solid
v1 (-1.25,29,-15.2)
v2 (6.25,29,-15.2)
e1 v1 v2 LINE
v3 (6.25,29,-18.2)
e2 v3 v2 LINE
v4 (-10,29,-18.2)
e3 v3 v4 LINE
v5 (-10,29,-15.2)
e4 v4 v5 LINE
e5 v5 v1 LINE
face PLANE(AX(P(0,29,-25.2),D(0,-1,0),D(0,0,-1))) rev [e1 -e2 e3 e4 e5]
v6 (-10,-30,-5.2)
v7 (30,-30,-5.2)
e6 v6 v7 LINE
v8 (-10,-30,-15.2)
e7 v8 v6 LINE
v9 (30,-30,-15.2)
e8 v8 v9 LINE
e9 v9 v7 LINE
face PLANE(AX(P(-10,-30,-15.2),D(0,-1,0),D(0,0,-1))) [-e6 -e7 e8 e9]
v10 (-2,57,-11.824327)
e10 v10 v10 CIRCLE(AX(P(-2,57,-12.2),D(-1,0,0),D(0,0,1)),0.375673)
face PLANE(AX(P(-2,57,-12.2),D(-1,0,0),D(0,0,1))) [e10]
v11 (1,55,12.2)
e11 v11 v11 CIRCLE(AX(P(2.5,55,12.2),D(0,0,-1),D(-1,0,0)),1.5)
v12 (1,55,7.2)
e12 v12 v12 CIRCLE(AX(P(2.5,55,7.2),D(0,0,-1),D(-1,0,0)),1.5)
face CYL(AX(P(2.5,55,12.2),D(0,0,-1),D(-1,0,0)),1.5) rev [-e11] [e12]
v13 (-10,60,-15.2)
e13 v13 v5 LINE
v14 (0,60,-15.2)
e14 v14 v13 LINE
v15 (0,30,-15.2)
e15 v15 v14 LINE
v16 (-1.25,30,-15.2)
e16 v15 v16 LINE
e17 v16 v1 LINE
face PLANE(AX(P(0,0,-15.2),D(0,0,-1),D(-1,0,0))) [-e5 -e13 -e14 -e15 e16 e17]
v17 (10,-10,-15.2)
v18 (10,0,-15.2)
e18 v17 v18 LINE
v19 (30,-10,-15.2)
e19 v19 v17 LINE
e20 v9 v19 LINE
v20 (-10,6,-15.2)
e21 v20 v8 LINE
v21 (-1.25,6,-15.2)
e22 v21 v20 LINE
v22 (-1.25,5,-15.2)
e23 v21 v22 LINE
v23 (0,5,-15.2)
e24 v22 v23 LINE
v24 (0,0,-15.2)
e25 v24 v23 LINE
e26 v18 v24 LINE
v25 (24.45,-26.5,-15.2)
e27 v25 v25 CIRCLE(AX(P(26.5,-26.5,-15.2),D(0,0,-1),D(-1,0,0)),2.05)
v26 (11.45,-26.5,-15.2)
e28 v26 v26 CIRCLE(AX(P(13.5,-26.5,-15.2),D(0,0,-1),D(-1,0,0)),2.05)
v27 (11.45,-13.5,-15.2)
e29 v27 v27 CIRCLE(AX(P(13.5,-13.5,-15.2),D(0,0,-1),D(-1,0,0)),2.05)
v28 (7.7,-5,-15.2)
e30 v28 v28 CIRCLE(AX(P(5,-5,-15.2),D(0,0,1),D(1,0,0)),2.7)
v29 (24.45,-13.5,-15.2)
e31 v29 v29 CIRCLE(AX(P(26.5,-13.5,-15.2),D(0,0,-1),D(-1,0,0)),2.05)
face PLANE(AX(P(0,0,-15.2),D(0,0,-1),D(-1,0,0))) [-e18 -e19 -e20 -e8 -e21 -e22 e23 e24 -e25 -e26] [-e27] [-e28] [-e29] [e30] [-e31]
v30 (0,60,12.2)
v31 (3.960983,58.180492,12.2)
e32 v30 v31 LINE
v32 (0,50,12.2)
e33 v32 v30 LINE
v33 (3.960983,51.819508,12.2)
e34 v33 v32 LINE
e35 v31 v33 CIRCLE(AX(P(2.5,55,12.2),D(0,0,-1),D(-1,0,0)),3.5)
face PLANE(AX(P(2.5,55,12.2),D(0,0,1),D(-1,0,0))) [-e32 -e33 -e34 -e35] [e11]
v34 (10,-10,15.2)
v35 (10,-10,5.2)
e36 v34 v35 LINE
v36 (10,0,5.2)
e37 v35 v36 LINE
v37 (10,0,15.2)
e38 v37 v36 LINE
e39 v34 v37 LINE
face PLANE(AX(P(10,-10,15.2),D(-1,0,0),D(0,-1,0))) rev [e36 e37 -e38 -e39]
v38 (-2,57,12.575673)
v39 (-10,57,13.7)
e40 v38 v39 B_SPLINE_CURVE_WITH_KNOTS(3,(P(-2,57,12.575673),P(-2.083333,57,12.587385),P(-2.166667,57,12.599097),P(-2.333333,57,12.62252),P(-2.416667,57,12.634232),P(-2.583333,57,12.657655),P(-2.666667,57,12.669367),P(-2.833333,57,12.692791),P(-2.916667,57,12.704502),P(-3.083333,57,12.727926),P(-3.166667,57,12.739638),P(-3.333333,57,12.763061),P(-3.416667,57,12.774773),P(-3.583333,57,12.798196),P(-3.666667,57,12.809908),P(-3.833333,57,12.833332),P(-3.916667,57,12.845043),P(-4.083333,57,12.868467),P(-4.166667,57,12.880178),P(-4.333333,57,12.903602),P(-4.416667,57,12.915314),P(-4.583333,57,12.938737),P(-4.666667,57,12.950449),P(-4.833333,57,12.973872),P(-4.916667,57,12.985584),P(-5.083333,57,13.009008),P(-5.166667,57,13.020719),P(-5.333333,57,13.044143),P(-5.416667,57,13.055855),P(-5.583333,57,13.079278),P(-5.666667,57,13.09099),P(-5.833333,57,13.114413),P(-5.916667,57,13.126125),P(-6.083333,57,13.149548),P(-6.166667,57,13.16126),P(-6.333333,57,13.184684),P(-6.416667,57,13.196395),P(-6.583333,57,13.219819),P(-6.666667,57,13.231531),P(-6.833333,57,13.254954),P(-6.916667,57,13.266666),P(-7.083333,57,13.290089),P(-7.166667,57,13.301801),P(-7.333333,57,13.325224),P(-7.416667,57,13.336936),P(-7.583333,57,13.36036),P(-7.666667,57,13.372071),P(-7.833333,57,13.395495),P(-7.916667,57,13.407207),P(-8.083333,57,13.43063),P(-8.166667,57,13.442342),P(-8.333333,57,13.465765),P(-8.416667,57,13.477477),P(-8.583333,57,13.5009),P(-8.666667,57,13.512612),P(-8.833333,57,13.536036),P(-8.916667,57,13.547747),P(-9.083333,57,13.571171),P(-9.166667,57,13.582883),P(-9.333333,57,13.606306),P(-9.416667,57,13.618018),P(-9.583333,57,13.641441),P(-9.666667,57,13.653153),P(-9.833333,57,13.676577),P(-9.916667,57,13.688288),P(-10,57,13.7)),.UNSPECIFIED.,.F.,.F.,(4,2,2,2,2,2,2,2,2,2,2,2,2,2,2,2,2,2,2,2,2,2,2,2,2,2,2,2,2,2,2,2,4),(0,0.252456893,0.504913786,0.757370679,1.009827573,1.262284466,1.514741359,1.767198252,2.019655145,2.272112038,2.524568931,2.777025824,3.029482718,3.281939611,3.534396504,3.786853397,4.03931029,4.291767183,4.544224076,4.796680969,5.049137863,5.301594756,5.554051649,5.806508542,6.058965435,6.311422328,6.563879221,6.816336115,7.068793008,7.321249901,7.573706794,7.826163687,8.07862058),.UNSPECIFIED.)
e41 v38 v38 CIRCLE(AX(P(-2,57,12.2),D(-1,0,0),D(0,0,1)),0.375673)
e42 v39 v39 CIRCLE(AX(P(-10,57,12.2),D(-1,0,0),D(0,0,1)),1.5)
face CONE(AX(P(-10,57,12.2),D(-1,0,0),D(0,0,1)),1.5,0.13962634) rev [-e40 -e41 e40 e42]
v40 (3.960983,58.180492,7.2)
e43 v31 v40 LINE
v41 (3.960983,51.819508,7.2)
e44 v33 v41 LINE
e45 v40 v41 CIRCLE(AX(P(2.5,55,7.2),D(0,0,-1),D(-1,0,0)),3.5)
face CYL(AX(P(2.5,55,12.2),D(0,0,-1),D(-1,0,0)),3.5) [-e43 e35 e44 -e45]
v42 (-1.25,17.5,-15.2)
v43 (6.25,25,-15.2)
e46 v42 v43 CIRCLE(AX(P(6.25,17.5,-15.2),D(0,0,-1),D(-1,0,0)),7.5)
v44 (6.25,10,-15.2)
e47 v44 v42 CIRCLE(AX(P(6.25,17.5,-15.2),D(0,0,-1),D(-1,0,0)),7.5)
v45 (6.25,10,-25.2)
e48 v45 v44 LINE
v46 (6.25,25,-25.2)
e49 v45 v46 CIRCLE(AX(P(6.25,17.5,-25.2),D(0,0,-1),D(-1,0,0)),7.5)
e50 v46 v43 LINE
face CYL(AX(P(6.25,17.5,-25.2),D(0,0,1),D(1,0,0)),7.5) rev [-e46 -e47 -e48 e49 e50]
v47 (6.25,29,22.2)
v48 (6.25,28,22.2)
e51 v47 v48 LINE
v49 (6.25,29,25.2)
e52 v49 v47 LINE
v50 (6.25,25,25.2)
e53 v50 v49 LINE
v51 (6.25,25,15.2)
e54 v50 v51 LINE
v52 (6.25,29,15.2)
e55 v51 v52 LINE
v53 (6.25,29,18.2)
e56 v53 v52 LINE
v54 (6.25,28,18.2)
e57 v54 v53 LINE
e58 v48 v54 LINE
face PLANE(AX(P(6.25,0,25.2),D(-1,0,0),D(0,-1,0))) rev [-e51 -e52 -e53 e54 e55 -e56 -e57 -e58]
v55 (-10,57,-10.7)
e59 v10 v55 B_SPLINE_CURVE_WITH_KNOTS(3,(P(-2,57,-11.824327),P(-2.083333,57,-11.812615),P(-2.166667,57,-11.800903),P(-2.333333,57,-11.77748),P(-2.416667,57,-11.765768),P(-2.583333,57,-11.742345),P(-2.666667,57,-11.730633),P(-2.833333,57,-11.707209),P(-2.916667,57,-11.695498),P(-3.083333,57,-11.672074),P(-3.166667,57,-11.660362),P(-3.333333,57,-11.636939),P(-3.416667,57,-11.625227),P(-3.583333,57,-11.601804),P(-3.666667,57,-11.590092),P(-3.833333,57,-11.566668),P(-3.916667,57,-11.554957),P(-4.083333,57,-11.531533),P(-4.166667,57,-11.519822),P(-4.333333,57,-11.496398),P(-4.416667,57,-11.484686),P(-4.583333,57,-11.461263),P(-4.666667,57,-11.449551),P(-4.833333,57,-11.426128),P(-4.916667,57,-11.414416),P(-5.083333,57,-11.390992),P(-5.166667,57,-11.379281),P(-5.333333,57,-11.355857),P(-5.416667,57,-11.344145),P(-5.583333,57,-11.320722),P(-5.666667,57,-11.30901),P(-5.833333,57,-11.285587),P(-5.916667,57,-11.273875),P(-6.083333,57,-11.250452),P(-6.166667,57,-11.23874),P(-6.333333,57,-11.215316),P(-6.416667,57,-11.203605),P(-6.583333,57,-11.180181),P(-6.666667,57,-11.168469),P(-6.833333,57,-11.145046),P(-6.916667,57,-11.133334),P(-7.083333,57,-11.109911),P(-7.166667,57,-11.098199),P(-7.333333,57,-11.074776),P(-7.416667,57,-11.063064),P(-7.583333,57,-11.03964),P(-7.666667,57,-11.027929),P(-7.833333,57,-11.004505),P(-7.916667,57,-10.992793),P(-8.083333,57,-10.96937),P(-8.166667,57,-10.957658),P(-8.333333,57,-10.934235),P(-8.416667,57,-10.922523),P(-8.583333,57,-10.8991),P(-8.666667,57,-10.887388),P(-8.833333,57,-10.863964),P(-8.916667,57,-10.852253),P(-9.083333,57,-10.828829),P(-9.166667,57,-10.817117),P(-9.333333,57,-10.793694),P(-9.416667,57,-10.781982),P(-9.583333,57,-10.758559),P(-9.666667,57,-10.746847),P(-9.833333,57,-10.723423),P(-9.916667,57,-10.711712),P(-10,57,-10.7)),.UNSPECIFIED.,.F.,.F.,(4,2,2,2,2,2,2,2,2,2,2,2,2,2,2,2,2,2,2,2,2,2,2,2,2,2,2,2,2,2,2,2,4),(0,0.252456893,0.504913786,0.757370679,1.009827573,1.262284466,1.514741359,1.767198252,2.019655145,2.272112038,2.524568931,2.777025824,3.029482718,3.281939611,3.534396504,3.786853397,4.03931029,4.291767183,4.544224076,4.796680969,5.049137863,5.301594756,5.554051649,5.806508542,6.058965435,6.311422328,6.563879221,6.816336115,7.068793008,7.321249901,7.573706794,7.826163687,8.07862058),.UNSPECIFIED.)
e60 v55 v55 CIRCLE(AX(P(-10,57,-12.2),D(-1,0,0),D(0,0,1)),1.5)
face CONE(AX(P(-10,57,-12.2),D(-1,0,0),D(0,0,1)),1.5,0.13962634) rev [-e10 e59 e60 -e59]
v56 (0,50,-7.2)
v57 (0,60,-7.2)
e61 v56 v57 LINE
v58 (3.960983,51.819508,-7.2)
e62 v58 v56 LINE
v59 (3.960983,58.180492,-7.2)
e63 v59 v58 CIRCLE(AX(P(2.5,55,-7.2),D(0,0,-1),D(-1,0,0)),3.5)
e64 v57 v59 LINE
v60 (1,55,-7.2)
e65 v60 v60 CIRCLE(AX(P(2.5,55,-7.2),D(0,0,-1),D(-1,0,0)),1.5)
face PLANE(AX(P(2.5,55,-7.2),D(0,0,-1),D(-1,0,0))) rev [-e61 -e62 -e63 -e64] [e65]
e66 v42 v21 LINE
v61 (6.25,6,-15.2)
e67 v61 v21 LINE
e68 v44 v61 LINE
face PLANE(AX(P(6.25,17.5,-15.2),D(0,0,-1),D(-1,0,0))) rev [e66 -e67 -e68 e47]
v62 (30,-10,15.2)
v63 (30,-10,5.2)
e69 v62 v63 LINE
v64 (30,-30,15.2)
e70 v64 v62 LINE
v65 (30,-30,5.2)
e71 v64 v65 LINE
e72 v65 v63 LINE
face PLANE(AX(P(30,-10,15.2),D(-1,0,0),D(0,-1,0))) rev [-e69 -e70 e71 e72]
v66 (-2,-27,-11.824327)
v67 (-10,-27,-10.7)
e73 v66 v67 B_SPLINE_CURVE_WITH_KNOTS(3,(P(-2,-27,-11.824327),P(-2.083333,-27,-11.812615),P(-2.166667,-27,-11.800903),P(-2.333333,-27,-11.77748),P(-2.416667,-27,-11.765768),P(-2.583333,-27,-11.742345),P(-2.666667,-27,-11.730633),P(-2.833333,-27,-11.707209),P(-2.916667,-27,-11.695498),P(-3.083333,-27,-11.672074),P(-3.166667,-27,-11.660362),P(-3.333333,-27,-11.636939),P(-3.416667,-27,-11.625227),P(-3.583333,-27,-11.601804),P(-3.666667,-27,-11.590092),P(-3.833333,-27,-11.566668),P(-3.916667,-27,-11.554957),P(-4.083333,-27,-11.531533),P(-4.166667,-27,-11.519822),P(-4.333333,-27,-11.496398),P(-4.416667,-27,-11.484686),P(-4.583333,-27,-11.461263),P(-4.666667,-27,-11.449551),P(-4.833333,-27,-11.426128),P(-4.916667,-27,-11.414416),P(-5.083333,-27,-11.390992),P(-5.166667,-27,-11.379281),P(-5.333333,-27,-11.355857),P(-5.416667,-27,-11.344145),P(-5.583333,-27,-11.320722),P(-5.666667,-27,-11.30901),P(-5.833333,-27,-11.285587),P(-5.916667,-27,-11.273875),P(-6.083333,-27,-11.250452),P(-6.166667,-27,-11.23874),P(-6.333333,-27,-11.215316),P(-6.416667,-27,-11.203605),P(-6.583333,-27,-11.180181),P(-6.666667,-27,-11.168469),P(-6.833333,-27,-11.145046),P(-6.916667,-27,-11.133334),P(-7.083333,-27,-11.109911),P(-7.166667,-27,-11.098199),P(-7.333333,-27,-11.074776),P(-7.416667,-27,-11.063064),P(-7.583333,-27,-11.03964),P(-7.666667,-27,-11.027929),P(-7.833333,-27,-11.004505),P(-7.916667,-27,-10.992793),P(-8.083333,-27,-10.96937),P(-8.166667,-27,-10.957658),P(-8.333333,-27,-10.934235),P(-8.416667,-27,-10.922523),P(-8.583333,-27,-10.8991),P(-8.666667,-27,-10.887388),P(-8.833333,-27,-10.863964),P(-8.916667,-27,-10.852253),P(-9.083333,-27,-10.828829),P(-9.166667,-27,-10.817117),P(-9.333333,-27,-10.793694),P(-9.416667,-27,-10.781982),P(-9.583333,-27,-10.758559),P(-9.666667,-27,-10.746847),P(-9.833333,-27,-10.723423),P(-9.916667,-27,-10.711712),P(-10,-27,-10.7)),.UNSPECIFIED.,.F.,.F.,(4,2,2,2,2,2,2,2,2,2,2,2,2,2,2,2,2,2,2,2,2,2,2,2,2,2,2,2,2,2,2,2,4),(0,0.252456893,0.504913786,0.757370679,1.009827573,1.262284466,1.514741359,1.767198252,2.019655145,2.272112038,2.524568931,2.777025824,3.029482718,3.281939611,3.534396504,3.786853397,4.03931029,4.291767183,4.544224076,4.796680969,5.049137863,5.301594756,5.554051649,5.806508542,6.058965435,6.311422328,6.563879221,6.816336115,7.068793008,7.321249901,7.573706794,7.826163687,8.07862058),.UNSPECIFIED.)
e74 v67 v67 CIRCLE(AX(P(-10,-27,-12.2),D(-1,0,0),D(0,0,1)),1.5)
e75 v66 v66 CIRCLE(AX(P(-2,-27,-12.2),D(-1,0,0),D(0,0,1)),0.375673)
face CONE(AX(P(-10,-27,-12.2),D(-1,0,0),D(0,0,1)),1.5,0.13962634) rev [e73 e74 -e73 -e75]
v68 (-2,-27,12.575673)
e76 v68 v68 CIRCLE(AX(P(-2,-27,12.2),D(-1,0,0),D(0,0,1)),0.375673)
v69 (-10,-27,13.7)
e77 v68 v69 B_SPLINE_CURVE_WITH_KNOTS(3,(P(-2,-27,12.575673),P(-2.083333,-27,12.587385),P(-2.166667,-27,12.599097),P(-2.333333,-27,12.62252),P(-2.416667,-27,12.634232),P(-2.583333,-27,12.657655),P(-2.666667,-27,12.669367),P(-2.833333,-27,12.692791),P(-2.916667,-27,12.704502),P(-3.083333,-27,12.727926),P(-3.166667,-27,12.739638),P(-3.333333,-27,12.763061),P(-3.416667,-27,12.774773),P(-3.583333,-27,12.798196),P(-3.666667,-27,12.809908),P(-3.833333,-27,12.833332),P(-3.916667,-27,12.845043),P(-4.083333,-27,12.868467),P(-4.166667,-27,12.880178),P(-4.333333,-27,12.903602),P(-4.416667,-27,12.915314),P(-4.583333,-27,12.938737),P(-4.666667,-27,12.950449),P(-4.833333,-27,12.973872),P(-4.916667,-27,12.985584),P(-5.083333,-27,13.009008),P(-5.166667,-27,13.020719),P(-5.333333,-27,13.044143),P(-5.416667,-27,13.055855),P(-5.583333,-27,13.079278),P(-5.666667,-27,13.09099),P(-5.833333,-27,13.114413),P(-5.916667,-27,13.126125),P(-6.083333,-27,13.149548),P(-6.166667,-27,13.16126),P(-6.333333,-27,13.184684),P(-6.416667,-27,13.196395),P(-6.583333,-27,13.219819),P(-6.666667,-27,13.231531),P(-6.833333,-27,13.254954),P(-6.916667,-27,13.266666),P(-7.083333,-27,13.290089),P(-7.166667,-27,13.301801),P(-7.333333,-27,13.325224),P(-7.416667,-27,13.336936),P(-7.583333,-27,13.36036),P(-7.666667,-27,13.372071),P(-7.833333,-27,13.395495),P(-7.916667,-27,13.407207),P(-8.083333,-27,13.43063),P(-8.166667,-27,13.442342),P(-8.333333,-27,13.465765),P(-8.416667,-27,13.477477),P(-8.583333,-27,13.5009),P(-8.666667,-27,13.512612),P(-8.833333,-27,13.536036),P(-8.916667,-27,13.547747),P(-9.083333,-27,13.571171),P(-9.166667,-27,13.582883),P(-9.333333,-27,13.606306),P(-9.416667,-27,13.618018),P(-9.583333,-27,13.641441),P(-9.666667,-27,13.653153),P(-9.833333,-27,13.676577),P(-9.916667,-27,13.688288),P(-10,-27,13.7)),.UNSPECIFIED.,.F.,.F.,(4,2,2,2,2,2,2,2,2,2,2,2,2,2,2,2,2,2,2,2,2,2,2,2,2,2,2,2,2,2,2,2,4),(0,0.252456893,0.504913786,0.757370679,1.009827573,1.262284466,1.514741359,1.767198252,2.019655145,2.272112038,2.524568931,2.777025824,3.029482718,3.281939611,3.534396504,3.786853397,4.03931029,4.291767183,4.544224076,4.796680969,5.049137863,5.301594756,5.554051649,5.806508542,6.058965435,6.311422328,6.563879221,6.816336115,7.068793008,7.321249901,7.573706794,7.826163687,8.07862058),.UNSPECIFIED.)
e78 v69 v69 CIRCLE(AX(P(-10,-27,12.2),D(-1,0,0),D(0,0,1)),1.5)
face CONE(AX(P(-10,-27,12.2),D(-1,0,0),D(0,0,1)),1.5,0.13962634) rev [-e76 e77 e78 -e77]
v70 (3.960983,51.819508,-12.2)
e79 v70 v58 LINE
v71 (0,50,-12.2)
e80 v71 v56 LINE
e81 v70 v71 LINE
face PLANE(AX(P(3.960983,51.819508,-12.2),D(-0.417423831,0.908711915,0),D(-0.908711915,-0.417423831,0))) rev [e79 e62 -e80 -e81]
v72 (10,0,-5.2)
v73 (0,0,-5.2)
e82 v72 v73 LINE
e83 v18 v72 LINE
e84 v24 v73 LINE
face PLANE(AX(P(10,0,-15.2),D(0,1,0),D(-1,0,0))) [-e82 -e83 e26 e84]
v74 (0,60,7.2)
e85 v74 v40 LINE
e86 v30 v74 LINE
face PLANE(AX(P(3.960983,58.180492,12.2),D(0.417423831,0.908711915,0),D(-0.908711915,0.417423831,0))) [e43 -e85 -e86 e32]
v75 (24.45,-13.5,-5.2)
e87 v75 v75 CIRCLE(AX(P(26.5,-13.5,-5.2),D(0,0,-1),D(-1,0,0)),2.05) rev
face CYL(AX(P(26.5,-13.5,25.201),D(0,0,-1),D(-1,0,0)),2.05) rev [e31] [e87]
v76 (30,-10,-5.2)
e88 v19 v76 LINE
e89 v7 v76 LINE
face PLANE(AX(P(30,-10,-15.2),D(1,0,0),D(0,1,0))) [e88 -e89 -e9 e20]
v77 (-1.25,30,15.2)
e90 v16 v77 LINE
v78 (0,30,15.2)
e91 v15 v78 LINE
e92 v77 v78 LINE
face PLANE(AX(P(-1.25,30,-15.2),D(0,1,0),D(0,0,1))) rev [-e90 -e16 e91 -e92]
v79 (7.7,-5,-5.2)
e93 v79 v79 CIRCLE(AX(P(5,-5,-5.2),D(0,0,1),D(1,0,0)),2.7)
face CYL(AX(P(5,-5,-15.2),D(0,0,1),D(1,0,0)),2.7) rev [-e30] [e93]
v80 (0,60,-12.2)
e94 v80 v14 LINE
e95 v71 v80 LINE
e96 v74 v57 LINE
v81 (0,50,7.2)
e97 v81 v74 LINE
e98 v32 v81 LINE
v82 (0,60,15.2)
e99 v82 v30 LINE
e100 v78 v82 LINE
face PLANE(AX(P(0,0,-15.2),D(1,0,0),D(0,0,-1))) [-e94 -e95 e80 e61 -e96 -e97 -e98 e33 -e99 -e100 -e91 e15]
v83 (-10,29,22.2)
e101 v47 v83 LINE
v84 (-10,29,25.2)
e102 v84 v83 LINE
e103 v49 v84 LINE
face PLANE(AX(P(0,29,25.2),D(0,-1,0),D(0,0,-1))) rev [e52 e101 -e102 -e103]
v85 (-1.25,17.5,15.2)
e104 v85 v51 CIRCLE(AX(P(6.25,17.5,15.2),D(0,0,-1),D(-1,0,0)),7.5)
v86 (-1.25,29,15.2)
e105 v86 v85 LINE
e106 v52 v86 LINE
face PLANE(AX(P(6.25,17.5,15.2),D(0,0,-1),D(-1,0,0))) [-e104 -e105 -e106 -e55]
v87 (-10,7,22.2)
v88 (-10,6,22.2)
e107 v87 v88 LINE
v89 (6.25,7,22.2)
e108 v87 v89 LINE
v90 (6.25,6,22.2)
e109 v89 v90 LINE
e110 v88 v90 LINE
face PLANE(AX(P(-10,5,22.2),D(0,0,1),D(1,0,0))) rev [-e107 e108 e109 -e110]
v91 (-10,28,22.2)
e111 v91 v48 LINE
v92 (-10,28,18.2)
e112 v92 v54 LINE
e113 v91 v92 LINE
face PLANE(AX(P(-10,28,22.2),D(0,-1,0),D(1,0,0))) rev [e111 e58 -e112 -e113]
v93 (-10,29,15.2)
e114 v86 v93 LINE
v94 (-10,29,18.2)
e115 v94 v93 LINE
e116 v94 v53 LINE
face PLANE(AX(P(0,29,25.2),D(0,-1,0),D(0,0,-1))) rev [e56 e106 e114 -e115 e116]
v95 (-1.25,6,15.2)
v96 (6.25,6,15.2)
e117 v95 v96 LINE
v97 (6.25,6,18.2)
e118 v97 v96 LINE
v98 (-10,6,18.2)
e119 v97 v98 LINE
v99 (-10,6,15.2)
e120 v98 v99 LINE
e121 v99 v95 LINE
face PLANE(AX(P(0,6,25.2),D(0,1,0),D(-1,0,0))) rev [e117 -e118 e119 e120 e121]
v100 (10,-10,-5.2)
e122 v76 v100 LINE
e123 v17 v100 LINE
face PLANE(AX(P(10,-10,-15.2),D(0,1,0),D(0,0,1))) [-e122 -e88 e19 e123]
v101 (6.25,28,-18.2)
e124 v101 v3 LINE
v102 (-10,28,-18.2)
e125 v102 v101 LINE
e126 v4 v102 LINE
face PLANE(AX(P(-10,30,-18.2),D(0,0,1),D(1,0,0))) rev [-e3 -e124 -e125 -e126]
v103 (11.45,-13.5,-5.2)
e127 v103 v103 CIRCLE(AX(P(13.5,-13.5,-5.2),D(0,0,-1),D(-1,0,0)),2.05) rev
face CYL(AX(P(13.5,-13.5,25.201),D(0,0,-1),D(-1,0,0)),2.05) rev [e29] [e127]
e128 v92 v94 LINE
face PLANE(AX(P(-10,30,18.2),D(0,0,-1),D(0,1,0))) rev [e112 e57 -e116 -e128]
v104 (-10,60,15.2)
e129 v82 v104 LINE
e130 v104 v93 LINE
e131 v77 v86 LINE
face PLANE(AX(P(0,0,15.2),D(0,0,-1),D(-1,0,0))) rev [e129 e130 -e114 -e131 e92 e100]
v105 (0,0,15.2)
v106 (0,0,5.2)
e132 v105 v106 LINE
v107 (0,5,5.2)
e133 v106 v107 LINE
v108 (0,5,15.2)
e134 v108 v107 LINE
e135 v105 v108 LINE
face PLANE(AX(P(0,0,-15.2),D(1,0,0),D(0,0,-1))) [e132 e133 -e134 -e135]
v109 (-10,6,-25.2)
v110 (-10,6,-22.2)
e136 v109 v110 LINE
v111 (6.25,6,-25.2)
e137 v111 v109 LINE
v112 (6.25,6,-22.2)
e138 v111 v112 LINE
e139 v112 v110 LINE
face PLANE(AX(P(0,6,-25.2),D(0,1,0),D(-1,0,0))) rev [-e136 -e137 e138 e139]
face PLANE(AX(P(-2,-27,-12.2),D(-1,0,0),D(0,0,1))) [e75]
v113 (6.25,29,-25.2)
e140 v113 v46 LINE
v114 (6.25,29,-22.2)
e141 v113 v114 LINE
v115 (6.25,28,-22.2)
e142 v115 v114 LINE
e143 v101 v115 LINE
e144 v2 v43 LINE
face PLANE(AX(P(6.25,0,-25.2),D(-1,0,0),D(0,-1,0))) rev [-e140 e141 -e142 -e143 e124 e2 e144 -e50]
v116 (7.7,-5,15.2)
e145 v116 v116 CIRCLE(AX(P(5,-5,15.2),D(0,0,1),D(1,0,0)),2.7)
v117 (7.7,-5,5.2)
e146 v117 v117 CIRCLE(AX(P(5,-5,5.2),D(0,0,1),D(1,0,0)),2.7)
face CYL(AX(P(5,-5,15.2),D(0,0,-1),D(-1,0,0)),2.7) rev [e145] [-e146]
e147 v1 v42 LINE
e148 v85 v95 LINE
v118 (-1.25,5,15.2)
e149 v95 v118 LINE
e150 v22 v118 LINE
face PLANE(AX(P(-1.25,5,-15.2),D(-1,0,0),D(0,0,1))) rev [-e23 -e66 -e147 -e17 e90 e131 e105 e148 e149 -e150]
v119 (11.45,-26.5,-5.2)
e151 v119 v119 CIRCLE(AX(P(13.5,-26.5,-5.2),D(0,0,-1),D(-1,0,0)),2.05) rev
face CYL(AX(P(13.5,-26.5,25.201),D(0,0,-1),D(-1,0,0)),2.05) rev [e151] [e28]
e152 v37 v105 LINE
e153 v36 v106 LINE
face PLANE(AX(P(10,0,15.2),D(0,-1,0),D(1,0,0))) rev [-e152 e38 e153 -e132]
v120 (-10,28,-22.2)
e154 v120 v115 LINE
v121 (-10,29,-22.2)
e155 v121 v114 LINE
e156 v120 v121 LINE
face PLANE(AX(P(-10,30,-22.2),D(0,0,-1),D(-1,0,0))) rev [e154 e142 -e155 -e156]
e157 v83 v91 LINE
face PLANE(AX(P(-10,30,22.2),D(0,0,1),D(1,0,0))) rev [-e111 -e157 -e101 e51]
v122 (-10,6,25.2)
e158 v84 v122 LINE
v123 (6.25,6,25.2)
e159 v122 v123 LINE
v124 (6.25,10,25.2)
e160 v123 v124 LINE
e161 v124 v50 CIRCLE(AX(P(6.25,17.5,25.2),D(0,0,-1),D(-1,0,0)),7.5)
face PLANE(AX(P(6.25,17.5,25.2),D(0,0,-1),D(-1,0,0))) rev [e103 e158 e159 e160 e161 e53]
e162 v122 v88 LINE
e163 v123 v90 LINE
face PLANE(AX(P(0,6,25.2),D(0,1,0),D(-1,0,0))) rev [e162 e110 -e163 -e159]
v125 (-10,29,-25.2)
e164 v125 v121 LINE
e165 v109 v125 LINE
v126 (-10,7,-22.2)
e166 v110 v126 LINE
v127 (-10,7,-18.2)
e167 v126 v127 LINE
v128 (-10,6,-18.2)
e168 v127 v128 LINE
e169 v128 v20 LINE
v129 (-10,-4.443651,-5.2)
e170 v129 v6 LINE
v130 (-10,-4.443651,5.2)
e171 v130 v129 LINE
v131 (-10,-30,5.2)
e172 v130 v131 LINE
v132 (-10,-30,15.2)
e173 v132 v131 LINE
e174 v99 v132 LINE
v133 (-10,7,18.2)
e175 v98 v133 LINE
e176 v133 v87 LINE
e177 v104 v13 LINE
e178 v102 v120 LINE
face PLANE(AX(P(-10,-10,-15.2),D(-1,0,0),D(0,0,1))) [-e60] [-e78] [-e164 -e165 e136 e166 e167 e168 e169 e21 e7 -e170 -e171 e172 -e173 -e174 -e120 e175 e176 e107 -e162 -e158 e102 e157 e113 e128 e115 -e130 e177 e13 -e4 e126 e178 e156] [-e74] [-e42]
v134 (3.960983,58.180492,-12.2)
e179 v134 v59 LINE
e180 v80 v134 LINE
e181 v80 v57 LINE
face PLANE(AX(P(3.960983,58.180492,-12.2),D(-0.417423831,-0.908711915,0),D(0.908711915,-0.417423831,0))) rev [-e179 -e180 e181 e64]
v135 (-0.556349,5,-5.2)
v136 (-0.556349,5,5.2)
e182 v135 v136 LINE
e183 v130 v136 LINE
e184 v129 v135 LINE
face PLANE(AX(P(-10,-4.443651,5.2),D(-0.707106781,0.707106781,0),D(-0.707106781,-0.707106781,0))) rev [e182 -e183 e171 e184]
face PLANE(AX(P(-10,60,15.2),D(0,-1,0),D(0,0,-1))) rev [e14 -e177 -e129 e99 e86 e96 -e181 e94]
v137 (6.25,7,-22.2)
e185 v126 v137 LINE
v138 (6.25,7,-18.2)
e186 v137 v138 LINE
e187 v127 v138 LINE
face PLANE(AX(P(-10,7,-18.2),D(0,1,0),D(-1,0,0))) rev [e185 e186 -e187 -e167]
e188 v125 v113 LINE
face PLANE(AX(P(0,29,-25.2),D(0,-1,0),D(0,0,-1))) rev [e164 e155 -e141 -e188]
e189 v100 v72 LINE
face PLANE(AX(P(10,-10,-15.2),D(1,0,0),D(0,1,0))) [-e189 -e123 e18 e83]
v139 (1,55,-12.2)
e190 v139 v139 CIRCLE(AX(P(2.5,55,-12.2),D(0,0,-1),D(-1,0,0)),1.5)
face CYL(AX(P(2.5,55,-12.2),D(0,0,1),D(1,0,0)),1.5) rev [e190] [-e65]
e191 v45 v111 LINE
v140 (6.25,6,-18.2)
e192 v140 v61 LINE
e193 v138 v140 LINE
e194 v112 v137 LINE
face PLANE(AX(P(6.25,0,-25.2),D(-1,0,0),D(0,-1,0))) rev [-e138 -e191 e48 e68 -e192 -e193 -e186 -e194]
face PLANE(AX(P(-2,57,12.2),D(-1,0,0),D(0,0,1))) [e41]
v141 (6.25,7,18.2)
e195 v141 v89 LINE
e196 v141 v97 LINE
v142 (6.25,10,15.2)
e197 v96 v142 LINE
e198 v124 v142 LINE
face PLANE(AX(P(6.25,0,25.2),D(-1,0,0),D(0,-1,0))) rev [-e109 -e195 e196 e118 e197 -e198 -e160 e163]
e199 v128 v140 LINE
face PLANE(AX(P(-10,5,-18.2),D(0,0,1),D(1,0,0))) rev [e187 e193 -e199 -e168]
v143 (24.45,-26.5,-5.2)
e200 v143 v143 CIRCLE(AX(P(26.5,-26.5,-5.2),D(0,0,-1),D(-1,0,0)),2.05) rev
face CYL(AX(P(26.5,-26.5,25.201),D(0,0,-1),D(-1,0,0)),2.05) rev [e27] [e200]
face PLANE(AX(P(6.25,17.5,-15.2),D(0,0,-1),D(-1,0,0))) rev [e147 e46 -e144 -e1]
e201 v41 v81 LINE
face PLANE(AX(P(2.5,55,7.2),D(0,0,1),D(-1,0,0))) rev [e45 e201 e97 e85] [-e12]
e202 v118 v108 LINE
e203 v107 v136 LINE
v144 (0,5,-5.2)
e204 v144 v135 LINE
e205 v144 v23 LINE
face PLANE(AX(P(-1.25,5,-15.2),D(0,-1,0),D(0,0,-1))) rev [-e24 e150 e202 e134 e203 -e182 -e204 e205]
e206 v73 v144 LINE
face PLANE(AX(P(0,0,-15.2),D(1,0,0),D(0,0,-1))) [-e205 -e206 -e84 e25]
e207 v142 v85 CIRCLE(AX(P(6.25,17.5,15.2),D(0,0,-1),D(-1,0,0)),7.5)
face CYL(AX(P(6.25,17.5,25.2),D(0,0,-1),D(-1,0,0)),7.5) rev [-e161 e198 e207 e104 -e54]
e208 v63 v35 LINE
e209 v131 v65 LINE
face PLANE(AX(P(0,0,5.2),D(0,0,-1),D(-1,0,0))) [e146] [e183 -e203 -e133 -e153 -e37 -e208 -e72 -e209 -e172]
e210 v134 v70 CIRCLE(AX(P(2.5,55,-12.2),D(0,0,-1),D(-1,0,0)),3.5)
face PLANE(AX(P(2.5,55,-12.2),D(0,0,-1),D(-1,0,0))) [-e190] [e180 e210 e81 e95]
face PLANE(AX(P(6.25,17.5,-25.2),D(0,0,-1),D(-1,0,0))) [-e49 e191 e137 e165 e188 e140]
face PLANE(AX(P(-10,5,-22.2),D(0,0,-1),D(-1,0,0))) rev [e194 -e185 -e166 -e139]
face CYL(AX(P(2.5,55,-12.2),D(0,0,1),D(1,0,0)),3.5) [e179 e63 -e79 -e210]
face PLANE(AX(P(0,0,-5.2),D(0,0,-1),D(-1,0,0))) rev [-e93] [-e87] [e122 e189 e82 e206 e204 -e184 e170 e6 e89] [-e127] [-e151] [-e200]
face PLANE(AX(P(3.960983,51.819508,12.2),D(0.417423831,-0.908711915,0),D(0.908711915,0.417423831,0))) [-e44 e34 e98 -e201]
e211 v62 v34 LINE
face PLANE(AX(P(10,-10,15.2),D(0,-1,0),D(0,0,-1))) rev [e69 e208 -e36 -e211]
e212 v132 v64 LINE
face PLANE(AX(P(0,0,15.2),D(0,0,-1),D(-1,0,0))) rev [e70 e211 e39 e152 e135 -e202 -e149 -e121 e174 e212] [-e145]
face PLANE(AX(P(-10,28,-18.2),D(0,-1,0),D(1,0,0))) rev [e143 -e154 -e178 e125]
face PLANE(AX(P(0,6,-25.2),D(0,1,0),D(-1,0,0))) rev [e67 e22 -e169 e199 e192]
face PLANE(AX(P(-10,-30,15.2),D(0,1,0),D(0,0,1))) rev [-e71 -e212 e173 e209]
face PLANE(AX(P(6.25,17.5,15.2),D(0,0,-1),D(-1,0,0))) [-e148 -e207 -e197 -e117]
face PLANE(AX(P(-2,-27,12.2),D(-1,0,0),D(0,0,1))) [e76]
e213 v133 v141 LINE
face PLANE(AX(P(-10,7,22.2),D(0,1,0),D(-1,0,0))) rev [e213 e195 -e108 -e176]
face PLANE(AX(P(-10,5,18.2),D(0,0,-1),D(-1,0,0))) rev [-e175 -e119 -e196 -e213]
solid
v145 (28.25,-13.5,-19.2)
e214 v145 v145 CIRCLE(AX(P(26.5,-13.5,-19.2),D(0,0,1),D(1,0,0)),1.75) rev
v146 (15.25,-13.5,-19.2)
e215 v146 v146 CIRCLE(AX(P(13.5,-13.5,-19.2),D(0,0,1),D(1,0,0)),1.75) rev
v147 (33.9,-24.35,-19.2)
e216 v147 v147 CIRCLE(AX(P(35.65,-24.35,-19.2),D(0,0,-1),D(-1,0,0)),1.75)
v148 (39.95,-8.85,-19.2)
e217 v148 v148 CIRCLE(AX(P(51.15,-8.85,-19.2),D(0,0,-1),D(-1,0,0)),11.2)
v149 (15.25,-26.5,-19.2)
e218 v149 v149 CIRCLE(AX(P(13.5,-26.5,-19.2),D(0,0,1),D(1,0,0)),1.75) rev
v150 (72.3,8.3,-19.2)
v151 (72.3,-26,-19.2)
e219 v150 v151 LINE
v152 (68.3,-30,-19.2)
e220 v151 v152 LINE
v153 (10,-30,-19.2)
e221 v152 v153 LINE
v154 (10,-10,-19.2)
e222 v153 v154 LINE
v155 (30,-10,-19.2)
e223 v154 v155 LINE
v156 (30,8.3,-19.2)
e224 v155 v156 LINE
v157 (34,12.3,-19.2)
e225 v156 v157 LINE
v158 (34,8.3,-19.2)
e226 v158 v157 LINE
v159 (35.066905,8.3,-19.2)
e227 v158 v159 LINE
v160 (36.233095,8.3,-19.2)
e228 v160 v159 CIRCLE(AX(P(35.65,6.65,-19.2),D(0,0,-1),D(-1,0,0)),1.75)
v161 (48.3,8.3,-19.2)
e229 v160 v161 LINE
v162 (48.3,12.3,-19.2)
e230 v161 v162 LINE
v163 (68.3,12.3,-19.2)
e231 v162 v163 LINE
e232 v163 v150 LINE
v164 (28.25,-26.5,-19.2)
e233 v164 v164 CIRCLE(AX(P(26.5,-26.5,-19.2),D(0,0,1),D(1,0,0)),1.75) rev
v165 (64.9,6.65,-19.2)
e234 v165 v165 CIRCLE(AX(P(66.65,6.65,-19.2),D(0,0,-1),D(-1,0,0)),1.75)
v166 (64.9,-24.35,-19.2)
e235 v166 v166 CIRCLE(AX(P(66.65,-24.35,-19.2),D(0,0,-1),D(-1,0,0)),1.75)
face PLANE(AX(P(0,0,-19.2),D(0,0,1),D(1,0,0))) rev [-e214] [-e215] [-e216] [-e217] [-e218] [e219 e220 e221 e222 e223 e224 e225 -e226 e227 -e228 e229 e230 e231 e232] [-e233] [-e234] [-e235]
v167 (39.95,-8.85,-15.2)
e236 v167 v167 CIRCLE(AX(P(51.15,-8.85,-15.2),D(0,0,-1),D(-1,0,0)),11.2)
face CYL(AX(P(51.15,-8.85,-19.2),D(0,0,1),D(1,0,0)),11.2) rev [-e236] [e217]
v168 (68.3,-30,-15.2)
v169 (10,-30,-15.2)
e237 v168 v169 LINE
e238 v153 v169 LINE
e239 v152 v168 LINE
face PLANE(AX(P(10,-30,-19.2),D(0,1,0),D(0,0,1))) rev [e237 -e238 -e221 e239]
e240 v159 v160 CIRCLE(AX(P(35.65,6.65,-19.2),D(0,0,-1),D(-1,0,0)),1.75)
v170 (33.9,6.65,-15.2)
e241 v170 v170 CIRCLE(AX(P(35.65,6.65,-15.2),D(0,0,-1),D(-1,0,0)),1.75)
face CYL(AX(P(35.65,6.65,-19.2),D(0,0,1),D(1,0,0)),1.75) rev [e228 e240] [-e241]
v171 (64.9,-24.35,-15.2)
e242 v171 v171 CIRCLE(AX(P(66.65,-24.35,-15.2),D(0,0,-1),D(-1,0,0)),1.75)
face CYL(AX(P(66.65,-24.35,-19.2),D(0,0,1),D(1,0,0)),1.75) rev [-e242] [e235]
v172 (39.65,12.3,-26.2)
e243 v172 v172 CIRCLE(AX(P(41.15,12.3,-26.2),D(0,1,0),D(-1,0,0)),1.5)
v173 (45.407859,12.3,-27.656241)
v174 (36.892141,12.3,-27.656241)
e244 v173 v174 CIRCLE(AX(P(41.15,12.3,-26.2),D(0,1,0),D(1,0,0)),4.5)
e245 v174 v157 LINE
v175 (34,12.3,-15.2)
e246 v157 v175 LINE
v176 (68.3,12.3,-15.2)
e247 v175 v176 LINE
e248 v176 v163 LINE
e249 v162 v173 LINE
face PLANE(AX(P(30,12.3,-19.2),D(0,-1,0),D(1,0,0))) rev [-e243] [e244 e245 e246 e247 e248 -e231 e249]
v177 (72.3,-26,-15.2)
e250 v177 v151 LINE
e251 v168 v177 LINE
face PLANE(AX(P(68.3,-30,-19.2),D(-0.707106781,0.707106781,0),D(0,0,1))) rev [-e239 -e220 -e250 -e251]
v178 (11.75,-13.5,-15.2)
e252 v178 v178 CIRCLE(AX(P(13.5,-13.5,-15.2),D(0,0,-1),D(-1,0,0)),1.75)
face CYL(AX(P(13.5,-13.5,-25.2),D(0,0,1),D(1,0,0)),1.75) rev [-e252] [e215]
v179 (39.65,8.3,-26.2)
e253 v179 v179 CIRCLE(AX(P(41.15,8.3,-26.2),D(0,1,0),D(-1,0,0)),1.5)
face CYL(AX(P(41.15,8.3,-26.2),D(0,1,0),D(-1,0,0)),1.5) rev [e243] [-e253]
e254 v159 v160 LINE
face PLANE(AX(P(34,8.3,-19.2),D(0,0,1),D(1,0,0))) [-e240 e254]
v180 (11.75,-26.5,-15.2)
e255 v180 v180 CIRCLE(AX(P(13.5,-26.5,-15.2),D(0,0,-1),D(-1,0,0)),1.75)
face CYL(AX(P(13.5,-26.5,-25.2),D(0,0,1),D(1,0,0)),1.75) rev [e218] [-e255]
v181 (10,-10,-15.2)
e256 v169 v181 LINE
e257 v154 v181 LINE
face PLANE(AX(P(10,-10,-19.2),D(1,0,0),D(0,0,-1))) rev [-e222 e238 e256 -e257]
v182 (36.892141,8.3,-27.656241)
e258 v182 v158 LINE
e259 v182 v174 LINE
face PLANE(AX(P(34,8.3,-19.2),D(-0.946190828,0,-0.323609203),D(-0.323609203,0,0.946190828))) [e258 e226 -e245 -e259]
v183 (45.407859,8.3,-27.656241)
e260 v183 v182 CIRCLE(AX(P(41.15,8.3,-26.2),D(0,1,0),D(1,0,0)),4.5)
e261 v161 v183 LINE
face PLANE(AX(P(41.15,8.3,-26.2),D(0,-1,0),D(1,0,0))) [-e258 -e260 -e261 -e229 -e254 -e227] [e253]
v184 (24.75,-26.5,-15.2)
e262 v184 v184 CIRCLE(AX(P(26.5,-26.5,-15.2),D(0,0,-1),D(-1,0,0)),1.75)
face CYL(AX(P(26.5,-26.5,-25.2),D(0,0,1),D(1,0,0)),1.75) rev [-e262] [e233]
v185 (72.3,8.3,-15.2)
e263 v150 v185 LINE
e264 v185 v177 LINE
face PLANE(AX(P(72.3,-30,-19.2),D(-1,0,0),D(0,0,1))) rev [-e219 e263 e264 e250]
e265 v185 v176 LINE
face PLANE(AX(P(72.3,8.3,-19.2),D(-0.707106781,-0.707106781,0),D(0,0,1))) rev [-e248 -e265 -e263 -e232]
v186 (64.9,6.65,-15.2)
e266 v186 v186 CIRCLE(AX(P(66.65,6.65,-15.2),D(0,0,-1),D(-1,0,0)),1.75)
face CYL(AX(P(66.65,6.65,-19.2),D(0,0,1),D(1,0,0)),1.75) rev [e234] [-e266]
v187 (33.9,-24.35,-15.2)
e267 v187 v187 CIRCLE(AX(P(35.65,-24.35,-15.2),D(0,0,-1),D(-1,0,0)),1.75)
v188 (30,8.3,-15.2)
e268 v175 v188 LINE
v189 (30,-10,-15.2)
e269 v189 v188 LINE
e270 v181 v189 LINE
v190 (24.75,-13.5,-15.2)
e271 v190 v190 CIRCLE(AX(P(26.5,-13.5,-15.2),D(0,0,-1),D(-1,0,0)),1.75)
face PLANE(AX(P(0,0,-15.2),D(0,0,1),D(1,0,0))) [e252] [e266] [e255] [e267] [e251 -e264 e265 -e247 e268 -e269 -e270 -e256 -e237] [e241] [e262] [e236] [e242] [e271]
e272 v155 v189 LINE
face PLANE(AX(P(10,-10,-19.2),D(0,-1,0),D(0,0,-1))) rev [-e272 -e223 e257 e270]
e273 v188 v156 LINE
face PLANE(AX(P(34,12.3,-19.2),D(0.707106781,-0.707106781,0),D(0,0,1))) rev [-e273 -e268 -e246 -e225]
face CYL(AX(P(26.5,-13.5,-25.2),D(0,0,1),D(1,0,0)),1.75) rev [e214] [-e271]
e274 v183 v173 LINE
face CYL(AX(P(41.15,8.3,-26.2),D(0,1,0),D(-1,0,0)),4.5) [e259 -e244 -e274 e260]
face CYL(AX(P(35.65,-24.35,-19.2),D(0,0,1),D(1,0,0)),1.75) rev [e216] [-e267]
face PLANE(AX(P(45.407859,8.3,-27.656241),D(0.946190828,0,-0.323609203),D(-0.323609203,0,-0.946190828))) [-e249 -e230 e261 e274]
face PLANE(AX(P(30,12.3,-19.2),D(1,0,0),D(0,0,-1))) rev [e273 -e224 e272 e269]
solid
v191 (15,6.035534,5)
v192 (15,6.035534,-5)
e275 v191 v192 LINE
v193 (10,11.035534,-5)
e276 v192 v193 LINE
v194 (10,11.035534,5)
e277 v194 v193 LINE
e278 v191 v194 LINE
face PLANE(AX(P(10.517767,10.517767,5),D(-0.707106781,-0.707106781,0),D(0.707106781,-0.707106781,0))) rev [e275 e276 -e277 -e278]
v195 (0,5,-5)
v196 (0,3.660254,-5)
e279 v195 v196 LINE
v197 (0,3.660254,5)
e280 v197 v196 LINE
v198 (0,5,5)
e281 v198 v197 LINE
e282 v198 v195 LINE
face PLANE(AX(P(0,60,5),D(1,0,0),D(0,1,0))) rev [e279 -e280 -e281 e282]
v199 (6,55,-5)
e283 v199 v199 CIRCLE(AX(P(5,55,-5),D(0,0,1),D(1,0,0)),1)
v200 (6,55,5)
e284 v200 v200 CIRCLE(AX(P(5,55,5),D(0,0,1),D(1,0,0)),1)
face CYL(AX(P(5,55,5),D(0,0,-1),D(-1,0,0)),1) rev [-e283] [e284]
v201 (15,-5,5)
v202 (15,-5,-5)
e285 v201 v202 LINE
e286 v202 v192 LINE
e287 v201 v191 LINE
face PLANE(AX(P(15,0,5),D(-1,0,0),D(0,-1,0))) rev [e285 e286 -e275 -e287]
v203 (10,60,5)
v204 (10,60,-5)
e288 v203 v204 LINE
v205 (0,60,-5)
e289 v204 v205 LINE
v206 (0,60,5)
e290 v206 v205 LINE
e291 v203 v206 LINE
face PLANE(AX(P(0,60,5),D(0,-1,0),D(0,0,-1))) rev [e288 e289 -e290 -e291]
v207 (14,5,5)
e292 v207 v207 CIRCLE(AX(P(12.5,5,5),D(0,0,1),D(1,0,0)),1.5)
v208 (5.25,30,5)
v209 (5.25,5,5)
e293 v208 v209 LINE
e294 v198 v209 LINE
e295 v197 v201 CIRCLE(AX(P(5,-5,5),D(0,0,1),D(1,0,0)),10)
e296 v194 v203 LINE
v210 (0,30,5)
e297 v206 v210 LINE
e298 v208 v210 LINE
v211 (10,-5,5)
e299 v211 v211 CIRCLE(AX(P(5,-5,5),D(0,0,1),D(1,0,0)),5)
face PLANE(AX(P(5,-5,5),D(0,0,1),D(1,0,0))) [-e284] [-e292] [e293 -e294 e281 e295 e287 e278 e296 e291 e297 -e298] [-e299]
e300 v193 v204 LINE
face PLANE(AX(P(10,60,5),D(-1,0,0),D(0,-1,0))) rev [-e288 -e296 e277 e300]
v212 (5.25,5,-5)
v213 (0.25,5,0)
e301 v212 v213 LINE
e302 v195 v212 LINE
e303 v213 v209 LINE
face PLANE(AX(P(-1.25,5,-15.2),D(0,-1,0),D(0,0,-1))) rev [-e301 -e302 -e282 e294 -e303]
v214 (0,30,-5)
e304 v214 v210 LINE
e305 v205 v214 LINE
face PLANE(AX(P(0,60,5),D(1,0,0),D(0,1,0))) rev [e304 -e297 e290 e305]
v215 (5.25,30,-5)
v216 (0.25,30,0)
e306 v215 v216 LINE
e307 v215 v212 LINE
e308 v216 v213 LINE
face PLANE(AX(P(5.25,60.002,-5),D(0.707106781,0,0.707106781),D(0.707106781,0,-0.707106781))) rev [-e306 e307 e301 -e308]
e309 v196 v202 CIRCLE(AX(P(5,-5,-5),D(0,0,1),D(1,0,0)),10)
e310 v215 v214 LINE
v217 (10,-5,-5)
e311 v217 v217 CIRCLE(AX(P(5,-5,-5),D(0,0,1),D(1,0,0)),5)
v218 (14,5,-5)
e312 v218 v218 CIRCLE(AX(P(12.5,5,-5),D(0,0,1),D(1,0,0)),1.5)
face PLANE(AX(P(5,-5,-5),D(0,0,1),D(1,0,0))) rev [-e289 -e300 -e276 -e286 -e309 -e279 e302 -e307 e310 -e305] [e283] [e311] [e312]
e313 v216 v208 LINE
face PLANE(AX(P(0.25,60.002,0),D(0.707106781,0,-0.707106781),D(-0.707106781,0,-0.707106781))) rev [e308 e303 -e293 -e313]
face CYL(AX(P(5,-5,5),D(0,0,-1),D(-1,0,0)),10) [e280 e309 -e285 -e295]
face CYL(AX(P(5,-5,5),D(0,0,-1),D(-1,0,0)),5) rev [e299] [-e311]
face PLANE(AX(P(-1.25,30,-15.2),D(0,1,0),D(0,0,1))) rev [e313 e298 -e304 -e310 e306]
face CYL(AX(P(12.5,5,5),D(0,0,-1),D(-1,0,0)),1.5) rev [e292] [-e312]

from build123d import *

# Parameters (mm, degrees)
BOSS_EXTRUDE1_START          = -5.2
SKETCH1_R                    = 2.7
BOSS_EXTRUDE1_DEPTH          = 10
BOSS_EXTRUDE3_START          = 5.2
SKETCH1_2_R                  = 2.7
BOSS_EXTRUDE3_DEPTH          = 10
SKETCH2_R                    = 5
SKETCH2_R_2                  = 1
BOSS_EXTRUDE2_DEPTH          = 5
BOSS_EXTRUDE4_DEPTH          = 5.2
CUT_EXTRUDE1_DEPTH           = 69.782555928
CUT_EXTRUDE1_DEPTH_BACK      = 69.782555928
SKETCH4_W                    = 2.5
SKETCH4_H                    = 25
BOSS_EXTRUDE5_START          = 15.2
BOSS_EXTRUDE5_DEPTH          = 10
BOSS_EXTRUDE6_START          = -25.2
BOSS_EXTRUDE6_DEPTH          = 10
CHAMFER1_SIZE                = 5
SKETCH6_R                    = 1.5
BOSS_EXTRUDE7_DEPTH          = 5
SKETCH7_W                    = 10
SKETCH7_H                    = 20
BOSS_EXTRUDE8_DEPTH          = 15.2
BOSS_EXTRUDE9_START          = -8
SKETCH8_R                    = 1.5
BOSS_EXTRUDE9_DEPTH          = 5
SKETCH9_W                    = 4
SKETCH9_H                    = 2
CUT_EXTRUDE2_DEPTH           = 70.275554852
SKETCH10_R                   = 1.5
CUT_EXTRUDE3_DEPTH           = 8
CUT_EXTRUDE3_DRAFT           = -8
CUT_EXTRUDE3_PROFILE_2_DEPTH = 8
CUT_EXTRUDE3_PROFILE_2_DRAFT = -8
CUT_EXTRUDE3_PROFILE_3_DEPTH = 8
CUT_EXTRUDE3_PROFILE_3_DRAFT = -8
CUT_EXTRUDE3_PROFILE_4_DEPTH = 8
CUT_EXTRUDE3_PROFILE_4_DRAFT = -8
SKETCH11_R                   = 2.05
SKETCH11_R_2                 = 1.75
CUT_EXTRUDE4_DEPTH           = 10
SKETCH12_R                   = 1.75
SKETCH12_R_2                 = 11.2
BOSS_EXTRUDE10_DEPTH         = 4
CHAMFER2_SIZE                = 4
SKETCH11_3_R                 = 1.75
CUT_EXTRUDE5_DEPTH           = 103.271452517
SKETCH14_R                   = 1.5
BOSS_EXTRUDE11_DEPTH         = 4
BOSS_EXTRUDE12_REACH         = 97.889


with BuildPart() as part:
    # Sketch1 → Boss-Extrude1 (new body)
    with BuildSketch(Plane.XY.offset(BOSS_EXTRUDE1_START)):
        Polygon((-10, 0), (-10, -10), (-10, -30), (30, -30), (30, -10), (10, -10), (10, 0), (0, 0), (0, 40), (-10, 40), align=None)
        with Locations((5, -5)):
            Circle(SKETCH1_R, mode=Mode.SUBTRACT)
    extrude(amount=-BOSS_EXTRUDE1_DEPTH)



with BuildPart() as body_2:
    # Sketch1<2> → Boss-Extrude3 (new body)
    with BuildSketch(Plane.XY.offset(BOSS_EXTRUDE3_START)):
        Polygon((-10, 0), (-10, -10), (-10, -30), (30, -30), (30, -10), (10, -10), (10, 0), (0, 0), (0, 40), (-10, 40), align=None)
        with Locations((5, -5)):
            Circle(SKETCH1_2_R, mode=Mode.SUBTRACT)
    extrude(amount=BOSS_EXTRUDE3_DEPTH)


with BuildPart() as body_3:
    # Sketch2 → Boss-Extrude2 (new, symmetric)
    with BuildSketch(Plane.XY):
        with BuildLine():
            Line((0, 60), (10, 60))
            Line((10, 60), (10, 3.660254038))
            ThreePointArc((10, 3.660254038), (5, -15), (0, 3.660254038))
            Line((0, 3.660254038), (0, 60))
        make_face()
        with Locations((5, -5)):
            Circle(SKETCH2_R, mode=Mode.SUBTRACT)
        with Locations((5, 55)):
            Circle(SKETCH2_R_2, mode=Mode.SUBTRACT)
    extrude(amount=BOSS_EXTRUDE2_DEPTH, both=True)


with BuildPart() as part_1:
    add(part.part)

    add(body_2.part)  # Boss-Extrude4 merges body 2
    # Sketch3 → Boss-Extrude4 (add, symmetric)
    with BuildSketch(Plane.XY):
        Polygon((-10, 40), (0, 40), (0, 5.556349186), (-10, -4.443650814), align=None)
    extrude(amount=BOSS_EXTRUDE4_DEPTH, both=True)


with BuildPart() as cut_extrude1_tool:
    # Sketch4 → Cut-Extrude1 (new, two sides: drawn at the far end of the back side and taken through both)
    with BuildSketch(Plane.XY.offset(-CUT_EXTRUDE1_DEPTH_BACK)):
        with Locations((0, 17.5)):
            Rectangle(SKETCH4_W, SKETCH4_H)
    extrude(amount=CUT_EXTRUDE1_DEPTH + CUT_EXTRUDE1_DEPTH_BACK)


with BuildPart() as part_2:
    add(part_1.part)

    # Cut-Extrude1: cut by cut_extrude1_tool
    add(cut_extrude1_tool.part, mode=Mode.SUBTRACT)

    # Sketch5 → Boss-Extrude5 (add)
    with BuildSketch(Plane.XY.offset(BOSS_EXTRUDE5_START)):
        with BuildLine():
            Line((6.25, 29), (-10, 29))
            Line((-10, 29), (-10, 6))
            Line((-10, 6), (6.25, 6))
            Line((6.25, 6), (6.25, 10))
            ThreePointArc((6.25, 10), (-1.25, 17.5), (6.25, 25))
            Line((6.25, 25), (6.25, 29))
        make_face()
    extrude(amount=BOSS_EXTRUDE5_DEPTH)

    # Sketch5<2> → Boss-Extrude6 (add)
    with BuildSketch(Plane.XY.offset(BOSS_EXTRUDE6_START)):
        with BuildLine():
            Line((6.25, 29), (-10, 29))
            Line((-10, 29), (-10, 6))
            Line((-10, 6), (6.25, 6))
            Line((6.25, 6), (6.25, 10))
            ThreePointArc((6.25, 10), (-1.25, 17.5), (6.25, 25))
            Line((6.25, 25), (6.25, 29))
        make_face()
    extrude(amount=BOSS_EXTRUDE6_DEPTH)

    # Sketch7 → Boss-Extrude8 (add, symmetric)
    with BuildSketch(Plane.XY):
        with Locations((-5, 50)):
            Rectangle(SKETCH7_W, SKETCH7_H)
    extrude(amount=BOSS_EXTRUDE8_DEPTH, both=True)

    # Sketch8 → Boss-Extrude9 (add)
    with BuildSketch(Plane(origin=(0, 0, -15.2), x_dir=(-1, 0, 0), z_dir=(0, 0, -1)).offset(BOSS_EXTRUDE9_START)):
        with BuildLine():
            Line((-3.960983408, 51.819508296), (0, 50))
            Line((0, 50), (0, 60))
            Line((0, 60), (-3.960983408, 58.180491704))
            ThreePointArc((-3.960983408, 58.180491704), (-6, 55), (-3.960983408, 51.819508296))
        make_face()
        with Locations((-2.5, 55)):
            Circle(SKETCH8_R, mode=Mode.SUBTRACT)
    boss_extrude9 = extrude(amount=BOSS_EXTRUDE9_DEPTH)

    # Mirror1: Boss-Extrude9 across plane
    add(boss_extrude9.mirror(Plane.XY))

    # Sketch9 → Cut-Extrude2 (cut, through all)
    with BuildSketch(Plane(origin=(6.25, 0, 0), x_dir=(0, 0, -1), z_dir=(1, 0, 0))):
        with Locations((20.2, 29)):
            Rectangle(SKETCH9_W, SKETCH9_H)
        with Locations((20.2, 6)):
            Rectangle(SKETCH9_W, SKETCH9_H)
        with Locations((-20.2, 6)):
            Rectangle(SKETCH9_W, SKETCH9_H)
        with Locations((-20.2, 29)):
            Rectangle(SKETCH9_W, SKETCH9_H)
    extrude(amount=-CUT_EXTRUDE2_DEPTH, mode=Mode.SUBTRACT)


with BuildPart() as body_3_1:
    add(body_3.part)

    # Cut-Extrude1: cut by cut_extrude1_tool
    add(cut_extrude1_tool.part, mode=Mode.SUBTRACT)

    # Chamfer1
    chamfer1_edges = [body_3_1.edges().sort_by_distance(p)[0] for p in [
        (1.25, 17.5, -5),
        (1.25, 17.5, 5),
    ]]
    chamfer(chamfer1_edges, length=CHAMFER1_SIZE - 0.0001)  # a hair under: the kernel refuses the full size

    # Sketch6 → Boss-Extrude7 (add, symmetric)
    with BuildSketch(Plane.XY):
        with BuildLine():
            Line((10, 11.035533906), (10, 3.660254038))
            ThreePointArc((10, 3.660254038), (13.660254038, 0), (15, -5))
            Line((15, -5), (15, 6.035533906))
            Line((15, 6.035533906), (10, 11.035533906))
        make_face()
        with Locations((12.5, 5)):
            Circle(SKETCH6_R, mode=Mode.SUBTRACT)
    extrude(amount=BOSS_EXTRUDE7_DEPTH, both=True)

    # Sketch15 → Boss-Extrude12 (add, up to next)
    with BuildSketch(Plane(origin=(0, 5, 0), x_dir=(1, 0, 0), z_dir=(0, 1, 0)), mode=Mode.PRIVATE) as boss_extrude12_sk1:
        Polygon((6.25, -5), (1.25, 0), (6.25, 5), (5.25, 5), (0.25, 0), (5.25, -5), align=None)
    boss_extrude12_tool1 = extrude(boss_extrude12_sk1.sketch, amount=BOSS_EXTRUDE12_REACH, mode=Mode.PRIVATE) - body_3_1.part
    add(boss_extrude12_tool1.solids().sort_by_distance((3.667538, 5, 2.582462))[0])


with BuildPart() as cut_extrude3_tool:
    # Sketch10 → Cut-Extrude3 (with draft: the straight prism first)
    with BuildSketch(Plane.ZY.offset(10)):
        with Locations((12.2, -27)):
            Circle(SKETCH10_R)
    extrude(amount=-CUT_EXTRUDE3_DEPTH)
    # Cut-Extrude3: the draft: its side faces are tilted about the plane it starts from
    cut_extrude3_sides = [cut_extrude3_tool.faces().sort_by_distance(p)[0] for p in [
        (-6, -27, 10.7),
    ]]
    draft(cut_extrude3_sides, Plane.ZY.offset(10), CUT_EXTRUDE3_DRAFT)


with BuildPart() as part_3:
    add(part_2.part)

    # Cut-Extrude3: cut by cut_extrude3_tool
    add(cut_extrude3_tool.part, mode=Mode.SUBTRACT)


with BuildPart() as cut_extrude3_profile_2_tool:
    # Sketch10 → Cut-Extrude3 profile 2 (with draft: the straight prism first)
    with BuildSketch(Plane.ZY.offset(10)):
        with Locations((-12.2, -27)):
            Circle(SKETCH10_R)
    extrude(amount=-CUT_EXTRUDE3_PROFILE_2_DEPTH)
    # Cut-Extrude3 profile 2: the draft: its side faces are tilted about the plane it starts from
    cut_extrude3_profile_2_sides = [cut_extrude3_profile_2_tool.faces().sort_by_distance(p)[0] for p in [
        (-6, -27, -13.7),
    ]]
    draft(cut_extrude3_profile_2_sides, Plane.ZY.offset(10), CUT_EXTRUDE3_PROFILE_2_DRAFT)


with BuildPart() as part_4:
    add(part_3.part)

    # Cut-Extrude3 profile 2: cut by cut_extrude3_profile_2_tool
    add(cut_extrude3_profile_2_tool.part, mode=Mode.SUBTRACT)


with BuildPart() as cut_extrude3_profile_3_tool:
    # Sketch10 → Cut-Extrude3 profile 3 (with draft: the straight prism first)
    with BuildSketch(Plane.ZY.offset(10)):
        with Locations((-12.2, 57)):
            Circle(SKETCH10_R)
    extrude(amount=-CUT_EXTRUDE3_PROFILE_3_DEPTH)
    # Cut-Extrude3 profile 3: the draft: its side faces are tilted about the plane it starts from
    cut_extrude3_profile_3_sides = [cut_extrude3_profile_3_tool.faces().sort_by_distance(p)[0] for p in [
        (-6, 57, -13.7),
    ]]
    draft(cut_extrude3_profile_3_sides, Plane.ZY.offset(10), CUT_EXTRUDE3_PROFILE_3_DRAFT)


with BuildPart() as part_5:
    add(part_4.part)

    # Cut-Extrude3 profile 3: cut by cut_extrude3_profile_3_tool
    add(cut_extrude3_profile_3_tool.part, mode=Mode.SUBTRACT)


with BuildPart() as cut_extrude3_profile_4_tool:
    # Sketch10 → Cut-Extrude3 profile 4 (with draft: the straight prism first)
    with BuildSketch(Plane.ZY.offset(10)):
        with Locations((12.2, 57)):
            Circle(SKETCH10_R)
    extrude(amount=-CUT_EXTRUDE3_PROFILE_4_DEPTH)
    # Cut-Extrude3 profile 4: the draft: its side faces are tilted about the plane it starts from
    cut_extrude3_profile_4_sides = [cut_extrude3_profile_4_tool.faces().sort_by_distance(p)[0] for p in [
        (-6, 57, 10.7),
    ]]
    draft(cut_extrude3_profile_4_sides, Plane.ZY.offset(10), CUT_EXTRUDE3_PROFILE_4_DRAFT)


with BuildPart() as part_6:
    add(part_5.part)

    # Cut-Extrude3 profile 4: cut by cut_extrude3_profile_4_tool
    add(cut_extrude3_profile_4_tool.part, mode=Mode.SUBTRACT)

    # Sketch11 → Cut-Extrude4 (cut)
    # profile 1 of 8: a face of its own
    with BuildSketch(Plane(origin=(0, 0, -15.2), x_dir=(-1, 0, 0), z_dir=(0, 0, -1))):
        with Locations((-26.5, -13.5)):
            Circle(SKETCH11_R)
        with Locations((-26.5, -13.5)):
            Circle(SKETCH11_R_2, mode=Mode.SUBTRACT)
    # profile 2 of 8: a face of its own
    with BuildSketch(Plane(origin=(0, 0, -15.2), x_dir=(-1, 0, 0), z_dir=(0, 0, -1))):
        with Locations((-13.5, -13.5)):
            Circle(SKETCH11_R)
        with Locations((-13.5, -13.5)):
            Circle(SKETCH11_R_2, mode=Mode.SUBTRACT)
    # profile 3 of 8: a face of its own
    with BuildSketch(Plane(origin=(0, 0, -15.2), x_dir=(-1, 0, 0), z_dir=(0, 0, -1))):
        with Locations((-13.5, -26.5)):
            Circle(SKETCH11_R)
        with Locations((-13.5, -26.5)):
            Circle(SKETCH11_R_2, mode=Mode.SUBTRACT)
    # profile 4 of 8: a face of its own
    with BuildSketch(Plane(origin=(0, 0, -15.2), x_dir=(-1, 0, 0), z_dir=(0, 0, -1))):
        with Locations((-26.5, -26.5)):
            Circle(SKETCH11_R)
        with Locations((-26.5, -26.5)):
            Circle(SKETCH11_R_2, mode=Mode.SUBTRACT)
    # profile 5 of 8: a face of its own
    with BuildSketch(Plane(origin=(0, 0, -15.2), x_dir=(-1, 0, 0), z_dir=(0, 0, -1))):
        with Locations((-26.5, -26.5)):
            Circle(SKETCH11_R_2)
    # profile 6 of 8: a face of its own
    with BuildSketch(Plane(origin=(0, 0, -15.2), x_dir=(-1, 0, 0), z_dir=(0, 0, -1))):
        with Locations((-13.5, -26.5)):
            Circle(SKETCH11_R_2)
    # profile 7 of 8: a face of its own
    with BuildSketch(Plane(origin=(0, 0, -15.2), x_dir=(-1, 0, 0), z_dir=(0, 0, -1))):
        with Locations((-13.5, -13.5)):
            Circle(SKETCH11_R_2)
    # profile 8 of 8: a face of its own
    with BuildSketch(Plane(origin=(0, 0, -15.2), x_dir=(-1, 0, 0), z_dir=(0, 0, -1))):
        with Locations((-26.5, -13.5)):
            Circle(SKETCH11_R_2)
    extrude(amount=-CUT_EXTRUDE4_DEPTH, mode=Mode.SUBTRACT)


with BuildPart() as body_3_2:
    # Sketch12 → Boss-Extrude10 (new body)
    with BuildSketch(Plane(origin=(0, 0, -15.2), x_dir=(-1, 0, 0), z_dir=(0, 0, -1))):
        Polygon((-30, 12.3), (-30, -10), (-10, -10), (-10, -30), (-30, -30), (-72.3, -30), (-72.3, 12.3), align=None)
        with Locations((-66.65, 6.65)):
            Circle(SKETCH12_R, mode=Mode.SUBTRACT)
        with Locations((-35.65, 6.65)):
            Circle(SKETCH12_R, mode=Mode.SUBTRACT)
        with Locations((-66.65, -24.35)):
            Circle(SKETCH12_R, mode=Mode.SUBTRACT)
        with Locations((-35.65, -24.35)):
            Circle(SKETCH12_R, mode=Mode.SUBTRACT)
        with Locations((-51.15, -8.85)):
            Circle(SKETCH12_R_2, mode=Mode.SUBTRACT)
    extrude(amount=BOSS_EXTRUDE10_DEPTH)

    # Chamfer2
    chamfer2_edges = [body_3_2.edges().sort_by_distance(p)[0] for p in [
        (72.3, -30, -17.2),
        (72.3, 12.3, -17.2),
        (30, 12.3, -17.2),
    ]]
    chamfer(chamfer2_edges, length=CHAMFER2_SIZE)

    # Sketch11<3> → Cut-Extrude5 (cut, through all)
    with BuildSketch(Plane(origin=(0, 0, -15.2), x_dir=(-1, 0, 0), z_dir=(0, 0, -1))):
        with Locations(Location((-26.5, -13.5, 0), (0, 0, 180))):
            Circle(SKETCH11_3_R)
        with Locations(Location((-13.5, -13.5, 0), (0, 0, 180))):
            Circle(SKETCH11_3_R)
        with Locations(Location((-13.5, -26.5, 0), (0, 0, 180))):
            Circle(SKETCH11_3_R)
        with Locations(Location((-26.5, -26.5, 0), (0, 0, 180))):
            Circle(SKETCH11_3_R)
    extrude(amount=CUT_EXTRUDE5_DEPTH, mode=Mode.SUBTRACT)

    # Sketch14 → Boss-Extrude11 (add)
    with BuildSketch(Plane(origin=(0, 12.3, 0), x_dir=(1, 0, 0), z_dir=(0, 1, 0))):
        with BuildLine():
            Line((34, 19.2), (36.892141273, 27.656241414))
            ThreePointArc((36.892141273, 27.656241414), (41.15, 30.7), (45.407858727, 27.656241414))
            Line((45.407858727, 27.656241414), (48.3, 19.2))
            Line((48.3, 19.2), (34, 19.2))
        make_face()
        with Locations(Location((41.15, 26.2, 0), (0, 0, 180))):
            Circle(SKETCH14_R, mode=Mode.SUBTRACT)
    extrude(amount=-BOSS_EXTRUDE11_DEPTH)


solid = Compound([body_3_1.part, part_6.part, body_3_2.part])
